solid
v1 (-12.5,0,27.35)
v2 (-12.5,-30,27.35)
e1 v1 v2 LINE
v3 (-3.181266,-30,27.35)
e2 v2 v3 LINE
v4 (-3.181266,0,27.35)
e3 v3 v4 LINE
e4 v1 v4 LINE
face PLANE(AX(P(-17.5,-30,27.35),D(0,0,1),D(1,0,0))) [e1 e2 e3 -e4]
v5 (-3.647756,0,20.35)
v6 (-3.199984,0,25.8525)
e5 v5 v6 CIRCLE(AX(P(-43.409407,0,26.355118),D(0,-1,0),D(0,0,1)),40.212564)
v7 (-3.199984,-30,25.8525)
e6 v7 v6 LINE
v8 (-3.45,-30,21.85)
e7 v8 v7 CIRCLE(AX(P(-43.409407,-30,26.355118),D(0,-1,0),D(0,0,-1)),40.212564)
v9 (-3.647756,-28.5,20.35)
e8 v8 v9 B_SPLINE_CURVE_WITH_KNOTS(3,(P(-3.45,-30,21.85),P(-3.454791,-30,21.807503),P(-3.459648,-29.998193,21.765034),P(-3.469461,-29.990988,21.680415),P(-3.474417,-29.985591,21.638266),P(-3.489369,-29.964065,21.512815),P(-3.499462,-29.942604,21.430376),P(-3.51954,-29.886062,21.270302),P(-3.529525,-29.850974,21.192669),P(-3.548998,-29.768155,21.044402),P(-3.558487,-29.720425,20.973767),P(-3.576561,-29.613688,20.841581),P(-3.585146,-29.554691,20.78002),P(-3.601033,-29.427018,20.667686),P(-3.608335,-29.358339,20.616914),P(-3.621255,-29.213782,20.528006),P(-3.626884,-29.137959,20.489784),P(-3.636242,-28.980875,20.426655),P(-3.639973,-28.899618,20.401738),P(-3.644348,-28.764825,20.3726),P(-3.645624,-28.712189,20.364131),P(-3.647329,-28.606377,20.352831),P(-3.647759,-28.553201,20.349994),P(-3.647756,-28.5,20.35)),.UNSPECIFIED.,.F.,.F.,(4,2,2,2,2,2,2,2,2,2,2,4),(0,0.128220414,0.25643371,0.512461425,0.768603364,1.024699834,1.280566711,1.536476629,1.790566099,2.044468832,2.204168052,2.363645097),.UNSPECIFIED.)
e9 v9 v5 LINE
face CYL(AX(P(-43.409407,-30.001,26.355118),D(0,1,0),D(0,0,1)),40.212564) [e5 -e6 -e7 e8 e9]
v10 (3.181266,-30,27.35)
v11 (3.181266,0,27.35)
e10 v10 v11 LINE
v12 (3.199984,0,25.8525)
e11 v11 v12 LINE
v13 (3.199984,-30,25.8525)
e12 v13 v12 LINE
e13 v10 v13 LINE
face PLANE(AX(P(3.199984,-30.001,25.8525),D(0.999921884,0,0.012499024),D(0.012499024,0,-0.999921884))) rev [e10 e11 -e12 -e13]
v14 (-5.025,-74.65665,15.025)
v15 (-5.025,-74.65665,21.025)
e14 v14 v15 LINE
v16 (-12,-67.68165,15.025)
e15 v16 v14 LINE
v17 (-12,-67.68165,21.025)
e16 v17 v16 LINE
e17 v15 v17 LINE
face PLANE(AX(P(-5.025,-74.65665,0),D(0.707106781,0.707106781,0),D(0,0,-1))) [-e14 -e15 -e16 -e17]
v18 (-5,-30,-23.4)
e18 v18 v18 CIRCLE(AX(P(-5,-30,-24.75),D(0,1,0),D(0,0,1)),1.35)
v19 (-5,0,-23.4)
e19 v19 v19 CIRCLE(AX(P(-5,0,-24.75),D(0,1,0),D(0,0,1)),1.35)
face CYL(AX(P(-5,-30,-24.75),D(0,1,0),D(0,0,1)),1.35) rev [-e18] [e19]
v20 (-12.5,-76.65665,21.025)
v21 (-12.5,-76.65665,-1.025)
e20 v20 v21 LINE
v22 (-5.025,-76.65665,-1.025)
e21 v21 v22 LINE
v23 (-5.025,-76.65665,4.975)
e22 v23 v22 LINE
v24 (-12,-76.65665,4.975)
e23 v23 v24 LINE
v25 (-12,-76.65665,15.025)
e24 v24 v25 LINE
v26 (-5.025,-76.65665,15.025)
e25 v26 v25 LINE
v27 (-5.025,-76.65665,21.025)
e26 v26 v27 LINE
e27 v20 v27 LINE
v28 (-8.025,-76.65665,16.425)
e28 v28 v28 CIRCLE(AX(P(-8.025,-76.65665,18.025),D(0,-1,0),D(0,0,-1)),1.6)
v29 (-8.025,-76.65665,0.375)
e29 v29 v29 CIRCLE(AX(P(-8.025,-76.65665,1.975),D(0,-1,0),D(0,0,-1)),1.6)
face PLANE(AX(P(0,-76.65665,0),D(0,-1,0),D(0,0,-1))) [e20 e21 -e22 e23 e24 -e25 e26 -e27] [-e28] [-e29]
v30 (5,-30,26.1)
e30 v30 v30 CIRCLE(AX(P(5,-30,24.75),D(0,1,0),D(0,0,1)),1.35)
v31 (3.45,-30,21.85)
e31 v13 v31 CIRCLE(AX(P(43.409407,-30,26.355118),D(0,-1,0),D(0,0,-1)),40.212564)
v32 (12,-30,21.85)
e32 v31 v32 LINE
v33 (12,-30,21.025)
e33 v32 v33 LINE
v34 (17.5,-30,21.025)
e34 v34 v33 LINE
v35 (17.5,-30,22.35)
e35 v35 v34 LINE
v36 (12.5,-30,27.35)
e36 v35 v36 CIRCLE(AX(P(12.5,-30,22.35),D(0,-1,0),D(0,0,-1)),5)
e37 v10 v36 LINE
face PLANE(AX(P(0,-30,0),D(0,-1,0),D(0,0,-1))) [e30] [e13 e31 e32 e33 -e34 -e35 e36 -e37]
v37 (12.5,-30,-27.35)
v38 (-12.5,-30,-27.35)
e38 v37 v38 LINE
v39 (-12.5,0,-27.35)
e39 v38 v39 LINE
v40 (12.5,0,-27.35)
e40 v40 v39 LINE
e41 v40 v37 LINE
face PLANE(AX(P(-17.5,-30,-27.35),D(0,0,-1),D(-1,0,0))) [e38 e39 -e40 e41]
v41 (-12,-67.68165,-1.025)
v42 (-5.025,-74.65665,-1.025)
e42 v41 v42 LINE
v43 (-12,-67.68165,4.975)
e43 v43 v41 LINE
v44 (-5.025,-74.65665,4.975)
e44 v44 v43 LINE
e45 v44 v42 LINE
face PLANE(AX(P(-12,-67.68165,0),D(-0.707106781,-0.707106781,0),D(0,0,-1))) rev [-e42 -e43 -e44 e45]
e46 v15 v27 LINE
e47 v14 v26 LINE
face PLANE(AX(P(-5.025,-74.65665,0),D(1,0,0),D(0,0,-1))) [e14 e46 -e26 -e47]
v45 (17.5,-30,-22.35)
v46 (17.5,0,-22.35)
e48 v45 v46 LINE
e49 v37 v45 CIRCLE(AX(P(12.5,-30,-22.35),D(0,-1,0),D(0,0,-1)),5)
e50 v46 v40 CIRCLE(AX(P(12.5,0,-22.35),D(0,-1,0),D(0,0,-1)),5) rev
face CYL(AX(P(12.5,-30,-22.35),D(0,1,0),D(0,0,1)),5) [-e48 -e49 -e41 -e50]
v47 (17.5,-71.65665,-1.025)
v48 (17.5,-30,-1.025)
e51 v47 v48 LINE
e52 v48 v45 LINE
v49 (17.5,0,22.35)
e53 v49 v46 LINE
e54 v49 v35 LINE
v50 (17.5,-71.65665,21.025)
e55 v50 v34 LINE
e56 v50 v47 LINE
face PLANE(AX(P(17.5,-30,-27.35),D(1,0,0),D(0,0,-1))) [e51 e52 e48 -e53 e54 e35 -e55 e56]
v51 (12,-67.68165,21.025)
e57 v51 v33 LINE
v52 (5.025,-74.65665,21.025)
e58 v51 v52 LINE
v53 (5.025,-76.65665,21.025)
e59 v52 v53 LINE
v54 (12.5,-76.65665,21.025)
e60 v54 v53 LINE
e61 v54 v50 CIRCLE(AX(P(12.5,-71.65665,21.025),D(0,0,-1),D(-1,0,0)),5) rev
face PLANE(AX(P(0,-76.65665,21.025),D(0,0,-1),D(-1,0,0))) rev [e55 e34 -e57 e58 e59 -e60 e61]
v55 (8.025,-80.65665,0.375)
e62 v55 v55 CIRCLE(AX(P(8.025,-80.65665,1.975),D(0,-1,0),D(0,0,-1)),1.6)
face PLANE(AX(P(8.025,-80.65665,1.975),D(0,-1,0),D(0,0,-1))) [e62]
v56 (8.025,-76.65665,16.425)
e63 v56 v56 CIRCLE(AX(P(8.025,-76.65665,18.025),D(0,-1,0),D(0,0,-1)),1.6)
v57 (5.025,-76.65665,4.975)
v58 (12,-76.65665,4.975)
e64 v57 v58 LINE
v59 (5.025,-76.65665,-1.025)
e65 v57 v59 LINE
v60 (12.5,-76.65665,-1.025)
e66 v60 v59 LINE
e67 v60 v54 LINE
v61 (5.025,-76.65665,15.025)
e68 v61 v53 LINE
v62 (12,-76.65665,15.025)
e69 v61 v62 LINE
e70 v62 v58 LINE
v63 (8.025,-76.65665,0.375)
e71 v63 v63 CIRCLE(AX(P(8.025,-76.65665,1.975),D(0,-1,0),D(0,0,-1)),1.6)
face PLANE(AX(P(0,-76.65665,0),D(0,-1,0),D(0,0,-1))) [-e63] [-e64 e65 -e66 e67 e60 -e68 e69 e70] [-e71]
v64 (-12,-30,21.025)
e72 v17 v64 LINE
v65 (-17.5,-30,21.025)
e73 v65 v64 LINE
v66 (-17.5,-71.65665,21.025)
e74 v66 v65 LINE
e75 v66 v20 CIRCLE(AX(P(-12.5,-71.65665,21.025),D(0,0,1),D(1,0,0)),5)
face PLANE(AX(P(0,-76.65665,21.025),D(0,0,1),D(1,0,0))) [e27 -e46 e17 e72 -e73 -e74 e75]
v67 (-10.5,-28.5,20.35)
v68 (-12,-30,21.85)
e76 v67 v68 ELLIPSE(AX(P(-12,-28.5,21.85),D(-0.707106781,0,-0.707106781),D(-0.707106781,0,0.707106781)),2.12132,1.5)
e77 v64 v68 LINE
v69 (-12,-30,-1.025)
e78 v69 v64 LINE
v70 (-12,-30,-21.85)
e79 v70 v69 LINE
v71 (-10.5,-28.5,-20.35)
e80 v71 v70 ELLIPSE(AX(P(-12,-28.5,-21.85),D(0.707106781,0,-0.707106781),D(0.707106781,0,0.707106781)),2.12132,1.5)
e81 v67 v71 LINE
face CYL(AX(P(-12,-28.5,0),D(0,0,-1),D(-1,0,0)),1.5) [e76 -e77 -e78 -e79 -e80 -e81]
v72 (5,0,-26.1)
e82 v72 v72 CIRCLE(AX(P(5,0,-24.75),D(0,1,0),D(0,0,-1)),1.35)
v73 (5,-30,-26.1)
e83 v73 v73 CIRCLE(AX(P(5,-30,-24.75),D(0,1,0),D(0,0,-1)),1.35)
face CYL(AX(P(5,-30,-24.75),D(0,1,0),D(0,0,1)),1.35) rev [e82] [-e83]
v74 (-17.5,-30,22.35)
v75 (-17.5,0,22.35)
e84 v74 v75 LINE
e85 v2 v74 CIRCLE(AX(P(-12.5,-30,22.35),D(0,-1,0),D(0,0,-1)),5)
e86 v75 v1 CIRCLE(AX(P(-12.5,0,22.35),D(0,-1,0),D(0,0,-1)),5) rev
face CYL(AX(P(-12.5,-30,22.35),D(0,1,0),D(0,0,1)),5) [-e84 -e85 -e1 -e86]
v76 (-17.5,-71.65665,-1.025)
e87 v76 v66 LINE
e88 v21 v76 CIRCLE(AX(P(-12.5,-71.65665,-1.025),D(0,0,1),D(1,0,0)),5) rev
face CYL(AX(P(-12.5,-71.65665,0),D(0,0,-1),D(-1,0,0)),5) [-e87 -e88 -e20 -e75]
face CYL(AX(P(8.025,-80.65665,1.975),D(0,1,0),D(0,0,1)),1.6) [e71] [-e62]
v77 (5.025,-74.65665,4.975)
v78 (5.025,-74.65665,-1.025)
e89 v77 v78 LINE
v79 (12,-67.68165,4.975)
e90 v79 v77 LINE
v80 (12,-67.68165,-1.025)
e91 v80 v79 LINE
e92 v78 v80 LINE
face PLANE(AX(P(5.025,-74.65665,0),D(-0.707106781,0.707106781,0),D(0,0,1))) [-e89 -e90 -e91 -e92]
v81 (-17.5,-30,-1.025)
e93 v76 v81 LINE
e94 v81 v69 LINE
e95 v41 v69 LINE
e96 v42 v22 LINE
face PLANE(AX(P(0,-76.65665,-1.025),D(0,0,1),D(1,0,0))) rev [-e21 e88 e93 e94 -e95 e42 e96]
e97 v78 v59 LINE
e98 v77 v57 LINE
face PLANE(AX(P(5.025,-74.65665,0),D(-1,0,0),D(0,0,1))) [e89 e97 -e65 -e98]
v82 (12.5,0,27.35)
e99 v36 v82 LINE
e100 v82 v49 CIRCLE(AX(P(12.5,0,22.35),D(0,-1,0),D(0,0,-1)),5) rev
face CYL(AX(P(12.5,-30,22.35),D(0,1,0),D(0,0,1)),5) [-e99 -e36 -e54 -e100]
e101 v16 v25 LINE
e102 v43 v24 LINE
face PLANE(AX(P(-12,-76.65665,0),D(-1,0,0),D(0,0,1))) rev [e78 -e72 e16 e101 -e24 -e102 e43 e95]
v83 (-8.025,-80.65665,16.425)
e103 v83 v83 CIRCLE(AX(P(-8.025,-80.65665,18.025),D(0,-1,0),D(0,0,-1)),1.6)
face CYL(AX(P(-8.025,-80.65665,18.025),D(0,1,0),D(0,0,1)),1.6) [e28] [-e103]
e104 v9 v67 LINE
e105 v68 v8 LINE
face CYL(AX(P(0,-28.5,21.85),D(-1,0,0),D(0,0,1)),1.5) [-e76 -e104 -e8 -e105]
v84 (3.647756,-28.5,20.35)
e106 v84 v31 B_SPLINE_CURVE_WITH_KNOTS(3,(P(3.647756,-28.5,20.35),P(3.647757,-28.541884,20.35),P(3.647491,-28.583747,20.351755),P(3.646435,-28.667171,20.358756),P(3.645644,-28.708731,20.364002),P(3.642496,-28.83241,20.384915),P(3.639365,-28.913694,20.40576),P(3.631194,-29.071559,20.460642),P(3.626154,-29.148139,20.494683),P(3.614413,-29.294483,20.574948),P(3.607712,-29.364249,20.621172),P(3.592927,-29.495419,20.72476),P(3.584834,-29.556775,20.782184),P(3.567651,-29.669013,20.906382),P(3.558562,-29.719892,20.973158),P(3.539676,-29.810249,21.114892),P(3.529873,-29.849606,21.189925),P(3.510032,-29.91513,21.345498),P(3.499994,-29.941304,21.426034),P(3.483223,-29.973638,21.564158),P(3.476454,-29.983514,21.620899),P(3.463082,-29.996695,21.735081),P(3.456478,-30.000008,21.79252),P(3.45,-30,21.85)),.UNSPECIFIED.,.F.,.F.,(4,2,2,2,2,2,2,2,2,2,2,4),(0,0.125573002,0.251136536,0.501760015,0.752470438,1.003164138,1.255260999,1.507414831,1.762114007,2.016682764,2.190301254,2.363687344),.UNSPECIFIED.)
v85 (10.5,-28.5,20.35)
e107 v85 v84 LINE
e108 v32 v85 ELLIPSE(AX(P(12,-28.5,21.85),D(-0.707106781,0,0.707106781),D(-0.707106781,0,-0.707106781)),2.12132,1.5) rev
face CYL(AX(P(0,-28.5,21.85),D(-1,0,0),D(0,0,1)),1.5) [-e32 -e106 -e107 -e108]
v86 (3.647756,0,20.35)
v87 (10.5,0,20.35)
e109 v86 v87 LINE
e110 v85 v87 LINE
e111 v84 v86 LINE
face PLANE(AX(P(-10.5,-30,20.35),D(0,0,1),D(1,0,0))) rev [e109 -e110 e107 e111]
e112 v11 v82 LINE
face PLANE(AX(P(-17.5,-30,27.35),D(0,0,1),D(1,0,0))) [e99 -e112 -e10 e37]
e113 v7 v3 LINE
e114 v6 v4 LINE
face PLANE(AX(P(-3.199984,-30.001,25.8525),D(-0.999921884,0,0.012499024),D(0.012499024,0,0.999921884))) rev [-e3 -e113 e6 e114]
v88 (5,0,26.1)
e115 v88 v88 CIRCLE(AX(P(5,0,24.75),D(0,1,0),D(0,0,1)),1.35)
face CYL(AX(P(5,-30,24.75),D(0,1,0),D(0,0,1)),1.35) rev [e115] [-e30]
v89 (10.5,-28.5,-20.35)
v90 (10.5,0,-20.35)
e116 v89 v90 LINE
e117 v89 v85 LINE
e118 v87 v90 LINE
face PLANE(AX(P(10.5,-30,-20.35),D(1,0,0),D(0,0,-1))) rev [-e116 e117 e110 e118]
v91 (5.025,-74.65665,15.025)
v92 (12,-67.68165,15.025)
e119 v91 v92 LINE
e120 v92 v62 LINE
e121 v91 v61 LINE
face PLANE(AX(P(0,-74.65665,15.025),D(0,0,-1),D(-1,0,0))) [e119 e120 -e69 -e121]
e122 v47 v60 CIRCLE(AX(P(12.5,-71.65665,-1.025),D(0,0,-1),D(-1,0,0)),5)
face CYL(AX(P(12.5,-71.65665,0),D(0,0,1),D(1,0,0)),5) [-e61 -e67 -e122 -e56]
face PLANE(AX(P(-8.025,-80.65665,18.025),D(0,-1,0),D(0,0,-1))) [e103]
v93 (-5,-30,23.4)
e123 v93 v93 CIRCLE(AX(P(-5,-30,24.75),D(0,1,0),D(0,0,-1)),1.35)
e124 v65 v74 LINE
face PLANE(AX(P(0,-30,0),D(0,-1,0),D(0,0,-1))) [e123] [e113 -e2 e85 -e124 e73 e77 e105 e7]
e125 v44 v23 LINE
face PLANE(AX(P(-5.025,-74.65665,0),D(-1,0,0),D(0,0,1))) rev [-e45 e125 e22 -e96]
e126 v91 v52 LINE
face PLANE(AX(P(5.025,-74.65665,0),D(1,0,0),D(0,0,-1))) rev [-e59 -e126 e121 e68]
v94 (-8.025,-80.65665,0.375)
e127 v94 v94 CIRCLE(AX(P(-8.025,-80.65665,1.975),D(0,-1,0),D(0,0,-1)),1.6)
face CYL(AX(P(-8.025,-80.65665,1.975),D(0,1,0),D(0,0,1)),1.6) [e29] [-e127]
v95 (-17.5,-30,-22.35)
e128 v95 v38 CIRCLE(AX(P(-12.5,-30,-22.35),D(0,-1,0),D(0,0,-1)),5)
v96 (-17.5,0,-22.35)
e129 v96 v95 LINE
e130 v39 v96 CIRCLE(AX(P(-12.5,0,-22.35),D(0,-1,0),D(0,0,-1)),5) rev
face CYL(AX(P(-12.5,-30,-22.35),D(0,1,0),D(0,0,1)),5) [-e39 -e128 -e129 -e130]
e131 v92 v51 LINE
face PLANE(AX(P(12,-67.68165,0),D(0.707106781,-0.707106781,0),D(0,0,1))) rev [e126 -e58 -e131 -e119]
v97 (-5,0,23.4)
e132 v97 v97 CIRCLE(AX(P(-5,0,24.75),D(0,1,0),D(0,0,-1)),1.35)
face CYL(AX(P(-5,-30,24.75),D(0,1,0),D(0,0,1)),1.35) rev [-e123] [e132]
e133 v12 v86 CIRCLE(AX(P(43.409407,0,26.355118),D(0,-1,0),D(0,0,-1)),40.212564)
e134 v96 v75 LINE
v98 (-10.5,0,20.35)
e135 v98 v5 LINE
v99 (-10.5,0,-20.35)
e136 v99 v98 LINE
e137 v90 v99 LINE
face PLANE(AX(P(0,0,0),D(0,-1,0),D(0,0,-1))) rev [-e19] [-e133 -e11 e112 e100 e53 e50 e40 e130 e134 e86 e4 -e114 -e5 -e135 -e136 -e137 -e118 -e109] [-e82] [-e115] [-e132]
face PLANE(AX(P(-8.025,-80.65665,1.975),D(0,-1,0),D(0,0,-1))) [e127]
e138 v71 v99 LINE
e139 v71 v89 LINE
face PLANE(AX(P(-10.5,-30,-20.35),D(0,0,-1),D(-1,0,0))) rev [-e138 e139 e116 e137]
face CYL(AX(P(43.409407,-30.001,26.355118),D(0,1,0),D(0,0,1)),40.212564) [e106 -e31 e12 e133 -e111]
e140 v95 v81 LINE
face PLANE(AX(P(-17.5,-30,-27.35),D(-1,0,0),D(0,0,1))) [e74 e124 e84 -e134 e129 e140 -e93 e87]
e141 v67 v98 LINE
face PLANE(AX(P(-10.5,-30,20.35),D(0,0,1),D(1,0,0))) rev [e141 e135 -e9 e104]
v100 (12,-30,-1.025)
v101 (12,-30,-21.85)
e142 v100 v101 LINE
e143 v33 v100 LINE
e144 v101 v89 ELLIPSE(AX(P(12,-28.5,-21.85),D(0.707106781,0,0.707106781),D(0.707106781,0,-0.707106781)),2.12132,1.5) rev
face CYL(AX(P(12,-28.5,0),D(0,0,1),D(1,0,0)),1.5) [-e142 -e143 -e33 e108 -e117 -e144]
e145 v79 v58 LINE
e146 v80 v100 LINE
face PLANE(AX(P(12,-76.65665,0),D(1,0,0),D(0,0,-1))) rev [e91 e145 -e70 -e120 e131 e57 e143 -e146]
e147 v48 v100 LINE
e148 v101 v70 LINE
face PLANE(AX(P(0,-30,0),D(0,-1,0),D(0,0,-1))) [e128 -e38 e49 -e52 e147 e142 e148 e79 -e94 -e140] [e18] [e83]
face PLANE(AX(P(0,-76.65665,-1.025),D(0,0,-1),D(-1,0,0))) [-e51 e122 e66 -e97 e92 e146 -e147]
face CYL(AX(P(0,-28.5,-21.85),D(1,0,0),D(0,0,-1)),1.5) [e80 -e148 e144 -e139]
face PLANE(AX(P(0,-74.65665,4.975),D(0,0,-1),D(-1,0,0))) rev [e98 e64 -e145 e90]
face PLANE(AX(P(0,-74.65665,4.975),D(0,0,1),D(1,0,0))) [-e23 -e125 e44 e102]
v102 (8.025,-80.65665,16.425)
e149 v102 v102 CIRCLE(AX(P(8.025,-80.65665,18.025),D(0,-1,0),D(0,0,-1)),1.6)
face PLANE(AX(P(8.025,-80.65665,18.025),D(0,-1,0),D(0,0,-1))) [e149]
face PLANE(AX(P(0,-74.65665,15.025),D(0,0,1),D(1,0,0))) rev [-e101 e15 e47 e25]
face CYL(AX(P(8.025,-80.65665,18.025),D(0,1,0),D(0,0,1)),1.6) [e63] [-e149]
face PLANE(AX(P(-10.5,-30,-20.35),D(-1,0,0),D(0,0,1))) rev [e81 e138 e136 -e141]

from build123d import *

# Parameters (mm, degrees)
SKETCH2_W           = 35
SKETCH2_H           = 54.7
SKETCH2_R           = 1.35
SKETCH2_W_2         = 21
SKETCH2_H_2         = 40.7
BOSS_EXTRUDE1_DEPTH = 30
CUT_EXTRUDE2_REACH  = 46.207
BORDES_SERVO_R      = 1.5
ALTURA_TORRES_DEPTH = 46.65665
BOSS_EXTRUDE3_START = 46.65665
SKETCH5_3_W         = 6.975
SKETCH5_3_H         = 6
BOSS_EXTRUDE3_DEPTH = 2
CHAMFER1_SIZE       = 6.975
BOSS_EXTRUDE4_START = 46.65665
SKETCH5_4_R         = 1.6
BOSS_EXTRUDE4_DEPTH = 4
BORDES_EXT_R        = 5


with BuildPart() as part:
    # Sketch2 → Boss-Extrude1 (new body)
    with BuildSketch(Plane(origin=(0, 0, 0), x_dir=(1, 0, 0), z_dir=(0, 1, 0))):
        Rectangle(SKETCH2_W, SKETCH2_H)
        with Locations(Location((-5, 24.75, 0), (0, 0, 270))):
            Circle(SKETCH2_R, mode=Mode.SUBTRACT)
        with Locations(Location((5, 24.75, 0), (0, 0, 90))):
            Circle(SKETCH2_R, mode=Mode.SUBTRACT)
        with Locations(Location((-5, -24.75, 0), (0, 0, 90))):
            Circle(SKETCH2_R, mode=Mode.SUBTRACT)
        with Locations(Location((5, -24.75, 0), (0, 0, 270))):
            Circle(SKETCH2_R, mode=Mode.SUBTRACT)
        Rectangle(SKETCH2_W_2, SKETCH2_H_2, mode=Mode.SUBTRACT)
    extrude(amount=-BOSS_EXTRUDE1_DEPTH)

    # Sketch4 → Cut-Extrude2 (cut, up to next)
    with BuildSketch(Plane(origin=(0, 0, 0), x_dir=(1, 0, 0), z_dir=(0, 1, 0)), mode=Mode.PRIVATE) as cut_extrude2_sk1:
        with BuildLine():
            Line((-3.199984377, -25.852499805), (-3.181265624, -27.35))
            Line((-3.181265624, -27.35), (3.181265624, -27.35))
            Line((3.181265624, -27.35), (3.199984377, -25.852499805))
            ThreePointArc((3.199984377, -25.852499805), (3.329330747, -23.093556632), (3.647756443, -20.35))
            Line((3.647756443, -20.35), (-3.647756443, -20.35))
            ThreePointArc((-3.647756443, -20.35), (-3.329330747, -23.093556632), (-3.199984377, -25.852499805))
        make_face()
    cut_extrude2_tool1 = extrude(cut_extrude2_sk1.sketch, amount=-CUT_EXTRUDE2_REACH, mode=Mode.PRIVATE) & part.part
    add(cut_extrude2_tool1.solids().sort_by_distance((0, 0, 23.771279))[0], mode=Mode.SUBTRACT)

    # Bordes_Servo
    bordes_servo_edges = [part.edges().sort_by_distance(p)[0] for p in [
        (10.5, -30, 0),
        (-7.073878222, -30, 20.35),
        (-10.5, -30, 0),
        (0, -30, -20.35),
        (7.073878222, -30, 20.35),
    ]]
    fillet(bordes_servo_edges, radius=BORDES_SERVO_R)

    # Sketch5 → Altura torres (add)
    with BuildSketch(Plane.XZ.offset(30)):
        Polygon((-12, 21.025), (-17.5, 21.025), (-17.5, -1.025), (-12, -1.025), (-12, 4.975), (-12, 15.025), align=None)
        Polygon((12, 4.975), (12, -1.025), (17.5, -1.025), (17.5, 21.025), (12, 21.025), (12, 15.025), align=None)
    extrude(amount=ALTURA_TORRES_DEPTH)

    # Sketch5<3> → Boss-Extrude3 (add)
    with BuildSketch(Plane.XZ.offset(30).offset(BOSS_EXTRUDE3_START)):
        with Locations((-8.5125, 18.025)):
            Rectangle(SKETCH5_3_W, SKETCH5_3_H)
        with Locations((-8.5125, 1.975)):
            Rectangle(SKETCH5_3_W, SKETCH5_3_H)
        with Locations((8.5125, 1.975)):
            Rectangle(SKETCH5_3_W, SKETCH5_3_H)
        with Locations((8.5125, 18.025)):
            Rectangle(SKETCH5_3_W, SKETCH5_3_H)
    extrude(amount=-BOSS_EXTRUDE3_DEPTH)

    # Chamfer1
    chamfer1_edges = [part.edges().sort_by_distance(p)[0] for p in [
        (12, -74.65665, 18.025),
        (12, -74.65665, 1.975),
        (-12, -74.65665, 18.025),
        (-12, -74.65665, 1.975),
    ]]
    chamfer(chamfer1_edges, length=CHAMFER1_SIZE - 0.0001)  # a hair under: the kernel refuses the full size

    # Sketch5<4> → Boss-Extrude4 (add)
    with BuildSketch(Plane.XZ.offset(30).offset(BOSS_EXTRUDE4_START)):
        with Locations(Location((8.025, 1.975, 0), (0, 0, 270))):
            Circle(SKETCH5_4_R)
        with Locations(Location((-8.025, 1.975, 0), (0, 0, 270))):
            Circle(SKETCH5_4_R)
        with Locations(Location((-8.025, 18.025, 0), (0, 0, 270))):
            Circle(SKETCH5_4_R)
        with Locations(Location((8.025, 18.025, 0), (0, 0, 270))):
            Circle(SKETCH5_4_R)
    extrude(amount=BOSS_EXTRUDE4_DEPTH)

    # Bordes_Ext
    bordes_ext_edges = [part.edges().sort_by_distance(p)[0] for p in [
        (17.5, -76.65665, 10),
        (17.5, -15, -27.35),
        (17.5, -15, 27.35),
        (-17.5, -15, 27.35),
        (-17.5, -15, -27.35),
        (-17.5, -76.65665, 10),
    ]]
    fillet(bordes_ext_edges, radius=BORDES_EXT_R)


solid = part.part
